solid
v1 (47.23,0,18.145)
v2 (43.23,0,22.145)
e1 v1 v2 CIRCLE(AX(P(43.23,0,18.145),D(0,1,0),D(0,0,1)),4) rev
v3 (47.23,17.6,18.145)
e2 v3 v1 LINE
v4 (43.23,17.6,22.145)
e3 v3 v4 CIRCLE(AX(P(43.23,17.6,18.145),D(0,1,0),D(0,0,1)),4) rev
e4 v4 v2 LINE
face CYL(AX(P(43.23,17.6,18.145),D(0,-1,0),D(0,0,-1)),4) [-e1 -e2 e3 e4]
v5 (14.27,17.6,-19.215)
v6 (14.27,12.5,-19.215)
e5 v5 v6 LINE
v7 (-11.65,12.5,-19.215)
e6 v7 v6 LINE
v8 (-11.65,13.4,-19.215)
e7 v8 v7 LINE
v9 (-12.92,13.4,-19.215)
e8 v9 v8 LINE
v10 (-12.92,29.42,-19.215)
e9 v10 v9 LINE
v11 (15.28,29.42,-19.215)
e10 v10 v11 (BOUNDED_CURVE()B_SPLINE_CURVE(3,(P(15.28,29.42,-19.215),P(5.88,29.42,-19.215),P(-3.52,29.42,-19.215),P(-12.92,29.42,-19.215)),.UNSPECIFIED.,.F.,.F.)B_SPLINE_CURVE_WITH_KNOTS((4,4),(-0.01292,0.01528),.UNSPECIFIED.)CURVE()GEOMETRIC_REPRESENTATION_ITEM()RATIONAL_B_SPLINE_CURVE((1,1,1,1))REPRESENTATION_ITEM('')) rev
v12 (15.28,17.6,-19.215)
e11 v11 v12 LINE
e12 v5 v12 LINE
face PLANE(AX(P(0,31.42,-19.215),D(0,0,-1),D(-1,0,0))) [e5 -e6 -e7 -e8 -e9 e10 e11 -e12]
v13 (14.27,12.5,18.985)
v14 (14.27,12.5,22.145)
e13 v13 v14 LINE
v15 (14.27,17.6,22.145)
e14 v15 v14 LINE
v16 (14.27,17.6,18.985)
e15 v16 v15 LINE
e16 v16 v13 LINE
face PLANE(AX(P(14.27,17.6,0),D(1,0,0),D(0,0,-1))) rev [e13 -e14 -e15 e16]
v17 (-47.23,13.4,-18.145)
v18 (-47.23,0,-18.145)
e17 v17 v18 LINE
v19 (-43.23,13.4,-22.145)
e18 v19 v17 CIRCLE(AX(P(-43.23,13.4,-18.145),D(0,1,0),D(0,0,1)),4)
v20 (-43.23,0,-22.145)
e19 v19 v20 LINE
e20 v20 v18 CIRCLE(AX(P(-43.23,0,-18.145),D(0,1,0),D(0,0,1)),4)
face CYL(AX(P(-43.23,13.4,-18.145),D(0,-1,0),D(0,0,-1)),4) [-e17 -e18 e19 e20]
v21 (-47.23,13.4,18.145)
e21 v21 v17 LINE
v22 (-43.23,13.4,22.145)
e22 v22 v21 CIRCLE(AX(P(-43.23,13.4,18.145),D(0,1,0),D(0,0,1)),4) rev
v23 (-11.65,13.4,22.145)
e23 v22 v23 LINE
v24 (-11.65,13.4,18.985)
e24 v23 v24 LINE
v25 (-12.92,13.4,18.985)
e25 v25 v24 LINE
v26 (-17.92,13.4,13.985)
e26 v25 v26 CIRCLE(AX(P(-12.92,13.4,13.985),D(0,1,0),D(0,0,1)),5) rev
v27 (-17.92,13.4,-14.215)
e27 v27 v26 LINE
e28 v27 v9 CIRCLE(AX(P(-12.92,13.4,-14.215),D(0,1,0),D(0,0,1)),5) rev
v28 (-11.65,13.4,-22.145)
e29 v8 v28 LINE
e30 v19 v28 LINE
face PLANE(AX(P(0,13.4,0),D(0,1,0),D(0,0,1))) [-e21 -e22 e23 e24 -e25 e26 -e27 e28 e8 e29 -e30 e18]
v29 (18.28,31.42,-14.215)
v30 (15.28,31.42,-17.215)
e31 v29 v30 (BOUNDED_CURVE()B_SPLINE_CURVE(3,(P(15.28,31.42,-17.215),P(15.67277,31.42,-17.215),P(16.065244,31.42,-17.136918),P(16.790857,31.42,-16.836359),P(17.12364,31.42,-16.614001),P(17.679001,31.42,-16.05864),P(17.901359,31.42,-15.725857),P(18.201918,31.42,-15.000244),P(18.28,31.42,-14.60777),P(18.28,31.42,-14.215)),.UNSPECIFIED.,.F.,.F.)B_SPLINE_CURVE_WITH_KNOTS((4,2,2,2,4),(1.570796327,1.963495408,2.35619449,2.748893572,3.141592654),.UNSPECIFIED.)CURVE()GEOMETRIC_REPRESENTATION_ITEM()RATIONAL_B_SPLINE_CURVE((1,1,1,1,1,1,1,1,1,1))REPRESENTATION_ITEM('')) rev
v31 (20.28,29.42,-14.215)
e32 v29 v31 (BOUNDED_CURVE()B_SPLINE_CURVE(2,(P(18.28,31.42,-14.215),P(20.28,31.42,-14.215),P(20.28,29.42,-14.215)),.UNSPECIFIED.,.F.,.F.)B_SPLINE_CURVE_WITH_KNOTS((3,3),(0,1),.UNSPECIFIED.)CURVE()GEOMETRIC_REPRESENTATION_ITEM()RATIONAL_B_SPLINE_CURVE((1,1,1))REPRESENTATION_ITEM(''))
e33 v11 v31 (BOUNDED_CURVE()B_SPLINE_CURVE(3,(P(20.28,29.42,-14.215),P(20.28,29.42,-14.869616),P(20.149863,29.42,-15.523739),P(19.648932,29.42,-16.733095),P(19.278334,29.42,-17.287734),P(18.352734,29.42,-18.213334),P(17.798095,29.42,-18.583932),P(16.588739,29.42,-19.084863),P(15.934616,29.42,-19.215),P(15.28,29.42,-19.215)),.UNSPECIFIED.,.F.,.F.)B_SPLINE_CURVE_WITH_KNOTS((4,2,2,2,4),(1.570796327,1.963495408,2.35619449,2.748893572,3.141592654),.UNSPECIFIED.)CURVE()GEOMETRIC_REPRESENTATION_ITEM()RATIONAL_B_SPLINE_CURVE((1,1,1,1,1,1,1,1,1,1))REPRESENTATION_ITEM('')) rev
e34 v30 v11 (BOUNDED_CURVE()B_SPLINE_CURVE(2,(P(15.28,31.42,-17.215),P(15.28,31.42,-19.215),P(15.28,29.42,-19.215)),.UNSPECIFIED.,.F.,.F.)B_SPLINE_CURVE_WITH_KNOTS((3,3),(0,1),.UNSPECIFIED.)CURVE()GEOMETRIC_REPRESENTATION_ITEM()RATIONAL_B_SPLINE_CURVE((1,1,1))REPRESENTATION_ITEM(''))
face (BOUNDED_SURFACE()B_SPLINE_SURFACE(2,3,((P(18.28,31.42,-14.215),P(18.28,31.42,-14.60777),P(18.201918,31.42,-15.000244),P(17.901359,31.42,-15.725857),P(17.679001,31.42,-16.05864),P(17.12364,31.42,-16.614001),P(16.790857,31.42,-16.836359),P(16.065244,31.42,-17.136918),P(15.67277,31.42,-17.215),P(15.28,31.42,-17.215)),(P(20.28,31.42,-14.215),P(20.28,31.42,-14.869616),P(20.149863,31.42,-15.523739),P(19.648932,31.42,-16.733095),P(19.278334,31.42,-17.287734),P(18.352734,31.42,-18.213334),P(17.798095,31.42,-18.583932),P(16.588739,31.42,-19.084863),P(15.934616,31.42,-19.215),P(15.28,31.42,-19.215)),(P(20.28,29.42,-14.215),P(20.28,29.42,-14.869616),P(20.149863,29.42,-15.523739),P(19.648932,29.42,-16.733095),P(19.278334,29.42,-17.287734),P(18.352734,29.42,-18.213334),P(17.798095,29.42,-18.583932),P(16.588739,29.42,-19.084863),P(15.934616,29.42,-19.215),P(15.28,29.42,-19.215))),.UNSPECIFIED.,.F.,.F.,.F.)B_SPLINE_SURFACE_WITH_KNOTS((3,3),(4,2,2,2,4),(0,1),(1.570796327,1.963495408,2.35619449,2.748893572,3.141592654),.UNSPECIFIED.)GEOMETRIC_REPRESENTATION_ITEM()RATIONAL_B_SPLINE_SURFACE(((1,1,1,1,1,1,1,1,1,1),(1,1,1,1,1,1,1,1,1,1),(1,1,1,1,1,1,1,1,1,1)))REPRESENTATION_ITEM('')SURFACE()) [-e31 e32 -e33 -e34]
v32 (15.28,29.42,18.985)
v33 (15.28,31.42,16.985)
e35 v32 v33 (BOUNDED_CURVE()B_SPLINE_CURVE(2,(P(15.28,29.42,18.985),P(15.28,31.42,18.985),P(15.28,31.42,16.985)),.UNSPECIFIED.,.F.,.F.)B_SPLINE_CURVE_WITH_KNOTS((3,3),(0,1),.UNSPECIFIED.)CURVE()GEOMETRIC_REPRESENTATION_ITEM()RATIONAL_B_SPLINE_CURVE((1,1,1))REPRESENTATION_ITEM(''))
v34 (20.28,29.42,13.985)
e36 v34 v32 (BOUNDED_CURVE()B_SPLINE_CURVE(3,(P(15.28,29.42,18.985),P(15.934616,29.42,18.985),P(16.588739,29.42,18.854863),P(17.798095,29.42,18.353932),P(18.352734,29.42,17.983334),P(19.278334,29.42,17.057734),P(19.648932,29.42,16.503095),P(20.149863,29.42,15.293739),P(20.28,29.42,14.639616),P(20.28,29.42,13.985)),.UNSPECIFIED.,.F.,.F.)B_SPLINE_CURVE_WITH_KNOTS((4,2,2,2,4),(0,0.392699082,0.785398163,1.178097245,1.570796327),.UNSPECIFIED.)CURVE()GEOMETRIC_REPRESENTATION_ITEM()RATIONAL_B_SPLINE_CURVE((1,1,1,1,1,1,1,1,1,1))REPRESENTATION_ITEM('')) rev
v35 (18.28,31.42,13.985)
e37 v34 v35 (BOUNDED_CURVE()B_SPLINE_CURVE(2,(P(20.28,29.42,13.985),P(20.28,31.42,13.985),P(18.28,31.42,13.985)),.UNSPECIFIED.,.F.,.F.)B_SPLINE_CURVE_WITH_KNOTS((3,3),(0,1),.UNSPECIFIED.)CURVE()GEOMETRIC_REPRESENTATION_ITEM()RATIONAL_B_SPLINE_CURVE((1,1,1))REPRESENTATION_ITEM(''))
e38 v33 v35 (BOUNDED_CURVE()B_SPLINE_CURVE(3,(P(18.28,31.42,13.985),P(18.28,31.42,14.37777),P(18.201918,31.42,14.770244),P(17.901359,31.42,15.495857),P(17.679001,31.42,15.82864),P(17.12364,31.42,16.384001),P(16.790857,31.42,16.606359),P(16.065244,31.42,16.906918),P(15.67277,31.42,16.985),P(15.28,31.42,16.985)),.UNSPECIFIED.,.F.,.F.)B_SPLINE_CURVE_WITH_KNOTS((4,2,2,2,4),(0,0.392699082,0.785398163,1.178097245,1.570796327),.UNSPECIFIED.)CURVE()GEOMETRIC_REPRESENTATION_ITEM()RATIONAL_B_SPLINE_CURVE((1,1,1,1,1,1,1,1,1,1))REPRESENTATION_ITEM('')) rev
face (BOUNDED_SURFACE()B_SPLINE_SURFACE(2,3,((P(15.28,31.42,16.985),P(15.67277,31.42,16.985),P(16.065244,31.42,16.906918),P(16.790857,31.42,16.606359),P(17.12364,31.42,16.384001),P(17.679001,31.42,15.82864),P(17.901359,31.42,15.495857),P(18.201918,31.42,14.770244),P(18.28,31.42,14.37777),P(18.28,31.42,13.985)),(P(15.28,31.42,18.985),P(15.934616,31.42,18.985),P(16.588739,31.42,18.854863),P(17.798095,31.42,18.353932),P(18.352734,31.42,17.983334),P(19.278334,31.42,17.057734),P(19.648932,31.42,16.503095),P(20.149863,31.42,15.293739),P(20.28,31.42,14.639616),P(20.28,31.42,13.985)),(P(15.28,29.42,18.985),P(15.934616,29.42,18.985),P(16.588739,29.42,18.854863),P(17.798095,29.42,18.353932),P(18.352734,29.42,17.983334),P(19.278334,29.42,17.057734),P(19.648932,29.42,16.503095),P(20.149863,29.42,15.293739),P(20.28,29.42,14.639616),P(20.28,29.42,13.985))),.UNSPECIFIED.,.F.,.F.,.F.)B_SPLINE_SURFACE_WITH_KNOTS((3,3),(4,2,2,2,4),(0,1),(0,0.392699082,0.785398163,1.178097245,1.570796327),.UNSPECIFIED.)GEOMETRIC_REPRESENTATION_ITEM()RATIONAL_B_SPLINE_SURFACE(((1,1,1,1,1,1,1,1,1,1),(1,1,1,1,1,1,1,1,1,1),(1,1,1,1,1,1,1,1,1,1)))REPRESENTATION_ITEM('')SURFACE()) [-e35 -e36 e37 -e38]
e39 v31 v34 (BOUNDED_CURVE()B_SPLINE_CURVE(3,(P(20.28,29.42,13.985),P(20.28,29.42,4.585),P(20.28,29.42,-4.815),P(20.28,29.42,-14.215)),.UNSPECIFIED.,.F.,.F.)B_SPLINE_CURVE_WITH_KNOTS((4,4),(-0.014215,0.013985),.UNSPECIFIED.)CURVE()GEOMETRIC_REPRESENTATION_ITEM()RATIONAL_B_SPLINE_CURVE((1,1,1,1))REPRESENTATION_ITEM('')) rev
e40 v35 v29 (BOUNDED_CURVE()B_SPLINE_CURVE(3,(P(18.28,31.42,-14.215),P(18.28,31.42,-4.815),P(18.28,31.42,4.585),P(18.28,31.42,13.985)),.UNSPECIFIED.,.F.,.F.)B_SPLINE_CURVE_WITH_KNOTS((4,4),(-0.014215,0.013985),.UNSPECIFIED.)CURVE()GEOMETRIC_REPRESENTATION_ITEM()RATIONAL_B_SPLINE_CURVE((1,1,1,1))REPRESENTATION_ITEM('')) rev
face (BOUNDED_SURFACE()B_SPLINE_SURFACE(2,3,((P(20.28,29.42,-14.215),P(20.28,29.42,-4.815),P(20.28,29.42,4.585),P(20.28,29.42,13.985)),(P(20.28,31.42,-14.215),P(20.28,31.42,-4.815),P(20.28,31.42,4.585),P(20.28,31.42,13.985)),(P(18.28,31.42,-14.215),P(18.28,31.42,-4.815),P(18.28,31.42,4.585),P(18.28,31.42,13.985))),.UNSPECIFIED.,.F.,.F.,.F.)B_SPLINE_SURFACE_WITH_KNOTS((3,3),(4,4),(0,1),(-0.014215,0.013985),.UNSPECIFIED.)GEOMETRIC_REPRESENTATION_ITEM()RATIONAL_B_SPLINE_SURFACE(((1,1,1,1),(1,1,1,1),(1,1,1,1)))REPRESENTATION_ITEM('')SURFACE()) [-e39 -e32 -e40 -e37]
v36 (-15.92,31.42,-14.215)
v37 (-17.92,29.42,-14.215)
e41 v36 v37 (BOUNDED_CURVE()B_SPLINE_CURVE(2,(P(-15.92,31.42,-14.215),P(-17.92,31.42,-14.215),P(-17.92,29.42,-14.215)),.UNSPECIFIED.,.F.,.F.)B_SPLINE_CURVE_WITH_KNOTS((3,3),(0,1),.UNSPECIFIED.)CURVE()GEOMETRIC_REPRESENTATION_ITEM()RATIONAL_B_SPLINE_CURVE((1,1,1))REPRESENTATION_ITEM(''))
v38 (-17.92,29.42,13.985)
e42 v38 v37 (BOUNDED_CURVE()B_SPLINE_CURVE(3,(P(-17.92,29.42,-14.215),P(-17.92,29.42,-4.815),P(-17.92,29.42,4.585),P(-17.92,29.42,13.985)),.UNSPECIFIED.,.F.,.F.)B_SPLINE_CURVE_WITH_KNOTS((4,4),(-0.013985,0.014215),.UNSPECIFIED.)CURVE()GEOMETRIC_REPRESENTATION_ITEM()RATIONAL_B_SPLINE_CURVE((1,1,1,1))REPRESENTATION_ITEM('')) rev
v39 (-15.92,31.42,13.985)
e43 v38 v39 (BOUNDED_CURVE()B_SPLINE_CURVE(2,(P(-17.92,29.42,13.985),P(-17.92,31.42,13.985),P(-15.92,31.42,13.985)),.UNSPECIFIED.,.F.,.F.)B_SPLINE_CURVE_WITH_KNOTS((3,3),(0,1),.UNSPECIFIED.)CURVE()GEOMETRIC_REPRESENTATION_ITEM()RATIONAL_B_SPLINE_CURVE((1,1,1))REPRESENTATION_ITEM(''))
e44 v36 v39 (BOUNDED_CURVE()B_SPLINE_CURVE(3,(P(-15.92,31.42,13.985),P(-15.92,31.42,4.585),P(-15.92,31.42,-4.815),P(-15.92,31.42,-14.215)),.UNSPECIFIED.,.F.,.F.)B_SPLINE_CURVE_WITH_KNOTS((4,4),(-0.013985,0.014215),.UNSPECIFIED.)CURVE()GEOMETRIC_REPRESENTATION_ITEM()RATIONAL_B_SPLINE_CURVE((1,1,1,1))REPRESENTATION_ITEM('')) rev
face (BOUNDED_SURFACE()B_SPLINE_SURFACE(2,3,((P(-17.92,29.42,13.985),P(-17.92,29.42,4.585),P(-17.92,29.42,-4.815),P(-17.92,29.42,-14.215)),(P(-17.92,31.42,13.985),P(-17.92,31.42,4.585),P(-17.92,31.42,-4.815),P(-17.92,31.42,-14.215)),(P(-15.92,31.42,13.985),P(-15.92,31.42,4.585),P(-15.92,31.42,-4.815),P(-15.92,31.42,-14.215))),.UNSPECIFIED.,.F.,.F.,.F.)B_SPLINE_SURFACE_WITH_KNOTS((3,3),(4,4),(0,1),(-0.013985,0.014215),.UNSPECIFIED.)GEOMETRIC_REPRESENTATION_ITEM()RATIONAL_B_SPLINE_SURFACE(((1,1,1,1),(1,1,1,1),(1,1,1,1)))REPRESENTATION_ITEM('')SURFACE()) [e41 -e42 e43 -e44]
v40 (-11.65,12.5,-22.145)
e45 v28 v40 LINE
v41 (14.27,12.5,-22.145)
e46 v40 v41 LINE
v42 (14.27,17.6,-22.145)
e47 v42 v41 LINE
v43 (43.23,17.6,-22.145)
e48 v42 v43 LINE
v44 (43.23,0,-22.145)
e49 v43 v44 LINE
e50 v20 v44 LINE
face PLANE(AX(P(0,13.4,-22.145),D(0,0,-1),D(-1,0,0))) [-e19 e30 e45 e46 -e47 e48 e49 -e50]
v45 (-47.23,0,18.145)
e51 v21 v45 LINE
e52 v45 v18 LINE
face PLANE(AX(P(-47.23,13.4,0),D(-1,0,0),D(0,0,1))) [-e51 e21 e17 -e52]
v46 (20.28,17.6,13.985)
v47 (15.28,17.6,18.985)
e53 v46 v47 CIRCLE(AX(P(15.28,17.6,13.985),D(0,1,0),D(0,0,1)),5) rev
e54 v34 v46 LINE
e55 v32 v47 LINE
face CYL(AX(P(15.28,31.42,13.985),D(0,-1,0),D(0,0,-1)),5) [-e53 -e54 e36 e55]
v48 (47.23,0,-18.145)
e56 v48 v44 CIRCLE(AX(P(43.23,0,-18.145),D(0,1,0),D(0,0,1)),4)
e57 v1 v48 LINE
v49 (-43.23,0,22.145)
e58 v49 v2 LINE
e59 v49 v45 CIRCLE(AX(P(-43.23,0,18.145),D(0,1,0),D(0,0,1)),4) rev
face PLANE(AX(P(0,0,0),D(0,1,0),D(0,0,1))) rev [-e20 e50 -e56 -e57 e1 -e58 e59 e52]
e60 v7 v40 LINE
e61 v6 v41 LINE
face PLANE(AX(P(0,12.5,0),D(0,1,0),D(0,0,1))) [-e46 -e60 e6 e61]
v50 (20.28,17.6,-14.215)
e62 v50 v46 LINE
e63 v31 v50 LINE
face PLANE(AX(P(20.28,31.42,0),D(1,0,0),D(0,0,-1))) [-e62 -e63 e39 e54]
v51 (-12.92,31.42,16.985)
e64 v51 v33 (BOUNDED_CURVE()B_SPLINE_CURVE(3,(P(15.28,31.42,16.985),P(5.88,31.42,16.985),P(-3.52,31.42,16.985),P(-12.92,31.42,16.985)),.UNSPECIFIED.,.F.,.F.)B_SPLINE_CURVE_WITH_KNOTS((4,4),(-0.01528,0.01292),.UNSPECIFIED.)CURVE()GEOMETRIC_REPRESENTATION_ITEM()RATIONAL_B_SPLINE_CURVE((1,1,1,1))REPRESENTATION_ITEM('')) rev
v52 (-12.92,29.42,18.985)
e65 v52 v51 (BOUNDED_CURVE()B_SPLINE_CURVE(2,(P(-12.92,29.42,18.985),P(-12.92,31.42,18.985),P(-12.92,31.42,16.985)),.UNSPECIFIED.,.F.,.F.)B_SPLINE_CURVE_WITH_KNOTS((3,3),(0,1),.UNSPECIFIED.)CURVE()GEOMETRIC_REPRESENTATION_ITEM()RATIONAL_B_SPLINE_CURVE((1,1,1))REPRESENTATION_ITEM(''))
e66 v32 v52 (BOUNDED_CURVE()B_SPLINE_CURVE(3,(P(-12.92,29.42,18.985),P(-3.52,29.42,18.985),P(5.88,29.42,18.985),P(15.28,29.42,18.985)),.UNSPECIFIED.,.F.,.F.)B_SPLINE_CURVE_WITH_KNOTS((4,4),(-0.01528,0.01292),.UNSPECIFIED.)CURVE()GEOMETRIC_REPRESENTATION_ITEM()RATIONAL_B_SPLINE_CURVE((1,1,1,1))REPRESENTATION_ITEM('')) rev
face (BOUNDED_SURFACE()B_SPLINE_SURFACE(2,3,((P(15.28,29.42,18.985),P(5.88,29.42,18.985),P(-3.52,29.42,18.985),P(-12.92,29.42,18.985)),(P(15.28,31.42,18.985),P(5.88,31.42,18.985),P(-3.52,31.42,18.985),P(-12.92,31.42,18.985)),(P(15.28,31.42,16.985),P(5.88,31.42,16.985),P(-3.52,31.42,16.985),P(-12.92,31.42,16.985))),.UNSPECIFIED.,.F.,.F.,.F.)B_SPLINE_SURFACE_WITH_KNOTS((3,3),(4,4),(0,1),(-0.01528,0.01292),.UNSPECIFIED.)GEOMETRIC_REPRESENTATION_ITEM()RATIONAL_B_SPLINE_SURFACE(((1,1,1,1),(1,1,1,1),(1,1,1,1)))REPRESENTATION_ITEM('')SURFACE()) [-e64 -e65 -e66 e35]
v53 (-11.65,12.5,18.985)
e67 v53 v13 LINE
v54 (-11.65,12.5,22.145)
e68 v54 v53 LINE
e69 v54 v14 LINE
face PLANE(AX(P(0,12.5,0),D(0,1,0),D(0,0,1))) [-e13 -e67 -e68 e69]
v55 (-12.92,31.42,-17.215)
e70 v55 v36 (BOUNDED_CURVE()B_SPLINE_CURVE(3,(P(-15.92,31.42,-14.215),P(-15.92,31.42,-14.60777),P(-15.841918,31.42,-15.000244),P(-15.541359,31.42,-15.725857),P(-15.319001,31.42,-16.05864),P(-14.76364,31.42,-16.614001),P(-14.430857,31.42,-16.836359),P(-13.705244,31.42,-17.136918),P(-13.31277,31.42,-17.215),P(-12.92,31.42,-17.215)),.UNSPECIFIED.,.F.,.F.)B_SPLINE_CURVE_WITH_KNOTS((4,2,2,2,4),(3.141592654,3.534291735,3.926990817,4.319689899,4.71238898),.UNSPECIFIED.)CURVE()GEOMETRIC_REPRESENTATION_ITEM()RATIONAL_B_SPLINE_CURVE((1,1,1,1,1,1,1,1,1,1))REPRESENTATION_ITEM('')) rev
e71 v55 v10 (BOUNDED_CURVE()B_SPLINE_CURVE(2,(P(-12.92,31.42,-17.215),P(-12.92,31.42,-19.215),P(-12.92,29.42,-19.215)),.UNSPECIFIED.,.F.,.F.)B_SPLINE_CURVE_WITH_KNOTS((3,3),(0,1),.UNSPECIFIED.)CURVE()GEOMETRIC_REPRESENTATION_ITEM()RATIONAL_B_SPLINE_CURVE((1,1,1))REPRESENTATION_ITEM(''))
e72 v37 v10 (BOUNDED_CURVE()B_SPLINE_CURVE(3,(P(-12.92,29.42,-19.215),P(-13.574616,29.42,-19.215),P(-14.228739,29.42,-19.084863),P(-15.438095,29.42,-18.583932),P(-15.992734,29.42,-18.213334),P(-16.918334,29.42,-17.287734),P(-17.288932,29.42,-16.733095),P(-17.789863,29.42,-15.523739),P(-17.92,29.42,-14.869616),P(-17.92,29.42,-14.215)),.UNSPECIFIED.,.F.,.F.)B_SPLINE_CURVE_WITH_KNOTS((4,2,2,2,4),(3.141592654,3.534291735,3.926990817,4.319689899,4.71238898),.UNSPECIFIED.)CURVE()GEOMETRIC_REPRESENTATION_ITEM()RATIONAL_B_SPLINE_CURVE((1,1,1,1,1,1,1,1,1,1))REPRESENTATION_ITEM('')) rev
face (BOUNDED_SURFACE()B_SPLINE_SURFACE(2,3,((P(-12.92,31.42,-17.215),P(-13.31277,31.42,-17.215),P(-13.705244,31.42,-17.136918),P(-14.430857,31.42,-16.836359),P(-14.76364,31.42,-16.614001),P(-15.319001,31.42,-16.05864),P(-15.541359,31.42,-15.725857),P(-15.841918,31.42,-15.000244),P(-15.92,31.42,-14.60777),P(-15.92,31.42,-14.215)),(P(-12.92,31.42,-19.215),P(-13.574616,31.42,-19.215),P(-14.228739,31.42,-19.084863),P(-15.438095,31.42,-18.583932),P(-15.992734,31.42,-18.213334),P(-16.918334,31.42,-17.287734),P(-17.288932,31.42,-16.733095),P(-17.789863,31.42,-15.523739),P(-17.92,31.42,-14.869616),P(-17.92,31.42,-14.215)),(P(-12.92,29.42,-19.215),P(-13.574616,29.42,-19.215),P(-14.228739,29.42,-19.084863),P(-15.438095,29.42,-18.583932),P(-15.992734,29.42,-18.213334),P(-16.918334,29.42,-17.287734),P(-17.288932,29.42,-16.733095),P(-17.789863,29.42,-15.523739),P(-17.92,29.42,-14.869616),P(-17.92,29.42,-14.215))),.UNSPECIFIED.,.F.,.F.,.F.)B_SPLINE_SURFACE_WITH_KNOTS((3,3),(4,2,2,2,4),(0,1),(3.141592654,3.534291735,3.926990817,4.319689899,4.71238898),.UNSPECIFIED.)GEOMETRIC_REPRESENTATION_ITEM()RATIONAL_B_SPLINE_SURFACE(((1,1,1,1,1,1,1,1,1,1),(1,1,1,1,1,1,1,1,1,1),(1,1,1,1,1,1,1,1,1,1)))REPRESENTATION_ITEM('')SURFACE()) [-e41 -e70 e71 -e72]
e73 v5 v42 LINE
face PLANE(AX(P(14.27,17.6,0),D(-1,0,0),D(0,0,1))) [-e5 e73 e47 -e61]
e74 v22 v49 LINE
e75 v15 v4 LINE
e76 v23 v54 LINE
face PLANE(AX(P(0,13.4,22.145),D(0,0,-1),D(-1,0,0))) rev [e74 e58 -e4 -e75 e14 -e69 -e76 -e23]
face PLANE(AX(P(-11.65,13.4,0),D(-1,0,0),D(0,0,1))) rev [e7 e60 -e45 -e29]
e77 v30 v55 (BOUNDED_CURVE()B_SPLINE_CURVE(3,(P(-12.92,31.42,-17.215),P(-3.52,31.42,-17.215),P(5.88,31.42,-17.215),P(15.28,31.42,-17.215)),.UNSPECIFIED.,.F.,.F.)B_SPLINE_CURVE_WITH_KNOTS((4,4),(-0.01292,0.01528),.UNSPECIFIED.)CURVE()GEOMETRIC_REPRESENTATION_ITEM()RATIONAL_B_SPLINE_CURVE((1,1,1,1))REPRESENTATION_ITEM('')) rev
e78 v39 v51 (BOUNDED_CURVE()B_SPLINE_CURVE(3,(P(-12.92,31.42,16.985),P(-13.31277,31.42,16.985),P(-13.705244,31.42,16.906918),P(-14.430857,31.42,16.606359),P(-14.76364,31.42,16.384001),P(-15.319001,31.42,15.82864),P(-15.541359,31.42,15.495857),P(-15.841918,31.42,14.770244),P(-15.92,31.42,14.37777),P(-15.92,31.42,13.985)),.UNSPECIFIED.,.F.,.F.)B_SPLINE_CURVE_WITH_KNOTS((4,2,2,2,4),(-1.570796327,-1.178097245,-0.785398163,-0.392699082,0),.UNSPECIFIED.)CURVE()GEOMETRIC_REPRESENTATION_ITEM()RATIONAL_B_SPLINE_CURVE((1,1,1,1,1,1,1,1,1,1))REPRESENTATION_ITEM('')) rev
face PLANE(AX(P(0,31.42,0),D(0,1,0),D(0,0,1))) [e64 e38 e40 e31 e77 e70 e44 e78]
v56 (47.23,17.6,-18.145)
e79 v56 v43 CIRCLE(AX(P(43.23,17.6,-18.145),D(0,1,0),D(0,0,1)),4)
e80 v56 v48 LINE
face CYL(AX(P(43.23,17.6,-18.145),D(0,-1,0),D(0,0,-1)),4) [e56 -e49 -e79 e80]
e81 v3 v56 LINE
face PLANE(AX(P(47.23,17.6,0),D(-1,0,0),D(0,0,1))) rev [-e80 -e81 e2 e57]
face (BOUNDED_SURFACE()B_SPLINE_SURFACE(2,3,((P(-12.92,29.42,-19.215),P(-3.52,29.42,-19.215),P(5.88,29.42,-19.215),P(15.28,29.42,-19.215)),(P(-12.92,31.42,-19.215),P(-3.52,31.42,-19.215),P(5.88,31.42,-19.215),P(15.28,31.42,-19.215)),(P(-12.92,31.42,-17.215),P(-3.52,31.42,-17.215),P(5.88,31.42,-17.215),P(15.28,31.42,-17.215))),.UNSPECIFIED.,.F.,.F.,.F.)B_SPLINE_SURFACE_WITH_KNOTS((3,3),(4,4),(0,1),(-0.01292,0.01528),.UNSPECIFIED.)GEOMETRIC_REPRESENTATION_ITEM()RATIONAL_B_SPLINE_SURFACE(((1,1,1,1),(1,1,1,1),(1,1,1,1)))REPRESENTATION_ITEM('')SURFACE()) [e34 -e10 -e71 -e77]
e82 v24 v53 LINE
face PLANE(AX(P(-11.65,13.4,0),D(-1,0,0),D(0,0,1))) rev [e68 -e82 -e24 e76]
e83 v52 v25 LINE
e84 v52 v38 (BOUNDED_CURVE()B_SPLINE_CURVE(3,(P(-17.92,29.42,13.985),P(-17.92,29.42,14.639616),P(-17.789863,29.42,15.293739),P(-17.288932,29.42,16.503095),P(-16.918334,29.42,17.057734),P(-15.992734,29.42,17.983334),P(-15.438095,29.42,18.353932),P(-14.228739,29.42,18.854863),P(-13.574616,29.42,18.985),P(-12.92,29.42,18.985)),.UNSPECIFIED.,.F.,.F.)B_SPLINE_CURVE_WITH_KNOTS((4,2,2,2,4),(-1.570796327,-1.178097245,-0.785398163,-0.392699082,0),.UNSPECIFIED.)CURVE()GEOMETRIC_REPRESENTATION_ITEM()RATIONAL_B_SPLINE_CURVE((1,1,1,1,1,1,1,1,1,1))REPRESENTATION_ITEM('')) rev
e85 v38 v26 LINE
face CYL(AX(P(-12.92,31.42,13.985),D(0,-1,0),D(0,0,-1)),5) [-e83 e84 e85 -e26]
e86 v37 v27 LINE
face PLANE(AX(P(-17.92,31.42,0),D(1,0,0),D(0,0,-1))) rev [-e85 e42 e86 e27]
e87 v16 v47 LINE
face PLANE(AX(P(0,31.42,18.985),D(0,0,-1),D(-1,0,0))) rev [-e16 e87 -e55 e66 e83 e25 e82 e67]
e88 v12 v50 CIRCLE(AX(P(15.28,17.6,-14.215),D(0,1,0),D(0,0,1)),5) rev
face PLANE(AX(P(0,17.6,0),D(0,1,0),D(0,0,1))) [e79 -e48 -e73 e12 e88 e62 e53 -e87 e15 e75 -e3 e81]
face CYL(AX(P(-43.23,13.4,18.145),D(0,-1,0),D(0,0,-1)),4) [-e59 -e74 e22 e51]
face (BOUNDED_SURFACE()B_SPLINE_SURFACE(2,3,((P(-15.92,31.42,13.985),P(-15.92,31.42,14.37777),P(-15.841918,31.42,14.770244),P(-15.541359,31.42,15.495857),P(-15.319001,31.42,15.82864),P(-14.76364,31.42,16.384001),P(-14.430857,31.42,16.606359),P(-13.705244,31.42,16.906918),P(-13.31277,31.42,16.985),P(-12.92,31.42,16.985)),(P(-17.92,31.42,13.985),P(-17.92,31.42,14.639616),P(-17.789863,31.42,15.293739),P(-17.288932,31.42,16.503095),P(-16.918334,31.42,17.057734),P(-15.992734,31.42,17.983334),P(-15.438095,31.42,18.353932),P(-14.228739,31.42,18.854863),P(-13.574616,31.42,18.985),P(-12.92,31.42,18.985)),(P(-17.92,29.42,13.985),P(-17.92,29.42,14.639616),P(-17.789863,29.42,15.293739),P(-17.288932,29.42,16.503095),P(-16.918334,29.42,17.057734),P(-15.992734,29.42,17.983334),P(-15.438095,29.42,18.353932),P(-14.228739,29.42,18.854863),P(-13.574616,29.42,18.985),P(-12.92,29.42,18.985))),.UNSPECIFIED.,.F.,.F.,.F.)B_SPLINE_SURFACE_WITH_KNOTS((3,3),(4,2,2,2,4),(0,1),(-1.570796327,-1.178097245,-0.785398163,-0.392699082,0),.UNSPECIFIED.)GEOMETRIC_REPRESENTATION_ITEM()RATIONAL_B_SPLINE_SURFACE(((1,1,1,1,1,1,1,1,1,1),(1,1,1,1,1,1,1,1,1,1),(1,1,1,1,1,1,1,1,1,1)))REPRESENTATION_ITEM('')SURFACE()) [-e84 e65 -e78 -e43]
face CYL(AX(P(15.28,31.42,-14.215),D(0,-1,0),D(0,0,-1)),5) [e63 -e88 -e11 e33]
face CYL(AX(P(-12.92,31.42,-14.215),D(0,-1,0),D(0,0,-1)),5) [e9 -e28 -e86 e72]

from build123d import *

# Parameters (mm, degrees)
BOSS_EXTRUDE1_DEPTH = 31.42
BOSS_EXTRUDE2_DEPTH = 13.4
BOSS_EXTRUDE3_DEPTH = 17.6
SKETCH1_5_W         = 25.92
SKETCH1_5_H         = 3.16
SKETCH1_5_H_2       = 2.93
BOSS_EXTRUDE4_DEPTH = 12.5
FILLET2_SIZE        = 2


with BuildPart() as part:
    # Sketch1 → Boss-Extrude1 (new body)
    with BuildSketch(Plane(origin=(0, 0, 0), x_dir=(1, 0, 0), z_dir=(0, 1, 0))):
        with BuildLine():
            Line((-12.92, 19.215), (15.28, 19.215))
            ThreePointArc((15.28, 19.215), (18.815533906, 17.750533906), (20.28, 14.215))
            Line((20.28, 14.215), (20.28, -13.985))
            ThreePointArc((20.28, -13.985), (18.815533906, -17.520533906), (15.28, -18.985))
            Line((15.28, -18.985), (-12.92, -18.985))
            ThreePointArc((-12.92, -18.985), (-16.455533906, -17.520533906), (-17.92, -13.985))
            Line((-17.92, -13.985), (-17.92, 14.215))
            ThreePointArc((-17.92, 14.215), (-16.455533906, 17.750533906), (-12.92, 19.215))
        make_face()
    extrude(amount=BOSS_EXTRUDE1_DEPTH)

    # Sketch1<3> → Boss-Extrude2 (add)
    with BuildSketch(Plane(origin=(0, 0, 0), x_dir=(1, 0, 0), z_dir=(0, 1, 0))):
        with BuildLine():
            Line((-43.23, -22.145), (-11.65, -22.145))
            Line((-11.65, -22.145), (-11.65, -18.985))
            Line((-11.65, -18.985), (-12.92, -18.985))
            ThreePointArc((-12.92, -18.985), (-16.455533906, -17.520533906), (-17.92, -13.985))
            Line((-17.92, -13.985), (-17.92, 14.215))
            ThreePointArc((-17.92, 14.215), (-16.455533906, 17.750533906), (-12.92, 19.215))
            Line((-12.92, 19.215), (-11.65, 19.215))
            Line((-11.65, 19.215), (-11.65, 22.145))
            Line((-11.65, 22.145), (-43.23, 22.145))
            ThreePointArc((-43.23, 22.145), (-46.058427125, 20.973427125), (-47.23, 18.145))
            Line((-47.23, 18.145), (-47.23, -18.145))
            ThreePointArc((-47.23, -18.145), (-46.058427125, -20.973427125), (-43.23, -22.145))
        make_face()
    extrude(amount=BOSS_EXTRUDE2_DEPTH)

    # Sketch1<4> → Boss-Extrude3 (add)
    with BuildSketch(Plane(origin=(0, 0, 0), x_dir=(1, 0, 0), z_dir=(0, 1, 0))):
        with BuildLine():
            Line((14.27, -18.985), (14.27, -22.145))
            Line((14.27, -22.145), (43.23, -22.145))
            ThreePointArc((43.23, -22.145), (46.058427125, -20.973427125), (47.23, -18.145))
            Line((47.23, -18.145), (47.23, 18.145))
            ThreePointArc((47.23, 18.145), (46.058427125, 20.973427125), (43.23, 22.145))
            Line((43.23, 22.145), (14.27, 22.145))
            Line((14.27, 22.145), (14.27, 19.215))
            Line((14.27, 19.215), (15.28, 19.215))
            ThreePointArc((15.28, 19.215), (18.815533906, 17.750533906), (20.28, 14.215))
            Line((20.28, 14.215), (20.28, -13.985))
            ThreePointArc((20.28, -13.985), (18.815533906, -17.520533906), (15.28, -18.985))
            Line((15.28, -18.985), (14.27, -18.985))
        make_face()
    extrude(amount=BOSS_EXTRUDE3_DEPTH)

    # Sketch1<5> → Boss-Extrude4 (add)
    with BuildSketch(Plane(origin=(0, 0, 0), x_dir=(1, 0, 0), z_dir=(0, 1, 0))):
        with Locations((1.31, -20.565)):
            Rectangle(SKETCH1_5_W, SKETCH1_5_H)
        with Locations((1.31, 20.68)):
            Rectangle(SKETCH1_5_W, SKETCH1_5_H_2)
    extrude(amount=BOSS_EXTRUDE4_DEPTH)

    # Fillet2
    # a fillet whose section is not a circle: 2 mm, written as the material it takes off along each edge
    with BuildSketch(Plane(origin=(-17.92, 31.42, 13.985), x_dir=(0, -1, 0), z_dir=(0, 0, -1)), Plane(origin=(-12.92, 31.42, -19.215), x_dir=(0, -1, 0), z_dir=(1, 0, 0)), Plane(origin=(20.28, 31.42, -14.215), x_dir=(0, -1, 0), z_dir=(0, 0, 1)), Plane(origin=(15.28, 31.42, 18.985), x_dir=(0, -1, 0), z_dir=(-1, 0, 0))) as fillet2_piece_1:
        with BuildLine():
            Bezier((FILLET2_SIZE, 0), (0, 0), (0, -FILLET2_SIZE), weights=[1, 1, 1])
            Line((0, -FILLET2_SIZE), (0, 0))
            Line((0, 0), (FILLET2_SIZE, 0))
        make_face()
    extrude(amount=28.2, mode=Mode.SUBTRACT)
    with BuildSketch(Plane(origin=(-12.92, 31.42, -14.215), x_dir=(-1, 0, 0), z_dir=(0, 0, 1))) as fillet2_piece_2:
        with BuildLine():
            Bezier((5, FILLET2_SIZE), (5, 0), (5 - FILLET2_SIZE, 0), weights=[1, 1, 1])
            Line((5 - FILLET2_SIZE, 0), (5, 0))
            Line((5, 0), (5, FILLET2_SIZE))
        make_face()
    revolve(axis=Axis((-12.92, 31.42, -14.215), (0, -1, 0)), revolution_arc=90, mode=Mode.SUBTRACT)
    with BuildSketch(Plane(origin=(15.28, 31.42, -14.215), x_dir=(0, 0, -1), z_dir=(-1, 0, 0))) as fillet2_piece_3:
        with BuildLine():
            Bezier((5 - FILLET2_SIZE, 0), (5, 0), (5, FILLET2_SIZE), weights=[1, 1, 1])
            Line((5, FILLET2_SIZE), (5, 0))
            Line((5, 0), (5 - FILLET2_SIZE, 0))
        make_face()
    revolve(axis=Axis((15.28, 31.42, -14.215), (0, -1, 0)), revolution_arc=90, mode=Mode.SUBTRACT)
    with BuildSketch(Plane(origin=(15.28, 31.42, 13.985), x_dir=(1, 0, 0), z_dir=(0, 0, -1))) as fillet2_piece_4:
        with BuildLine():
            Bezier((5, FILLET2_SIZE), (5, 0), (5 - FILLET2_SIZE, 0), weights=[1, 1, 1])
            Line((5 - FILLET2_SIZE, 0), (5, 0))
            Line((5, 0), (5, FILLET2_SIZE))
        make_face()
    revolve(axis=Axis((15.28, 31.42, 13.985), (0, -1, 0)), revolution_arc=90, mode=Mode.SUBTRACT)
    with BuildSketch(Plane(origin=(-12.92, 31.42, 13.985), x_dir=(0, 0, 1), z_dir=(1, 0, 0))) as fillet2_piece_5:
        with BuildLine():
            Bezier((5, FILLET2_SIZE), (5, 0), (5 - FILLET2_SIZE, 0), weights=[1, 1, 1])
            Line((5 - FILLET2_SIZE, 0), (5, 0))
            Line((5, 0), (5, FILLET2_SIZE))
        make_face()
    revolve(axis=Axis((-12.92, 31.42, 13.985), (0, -1, 0)), revolution_arc=90, mode=Mode.SUBTRACT)


solid = part.part
